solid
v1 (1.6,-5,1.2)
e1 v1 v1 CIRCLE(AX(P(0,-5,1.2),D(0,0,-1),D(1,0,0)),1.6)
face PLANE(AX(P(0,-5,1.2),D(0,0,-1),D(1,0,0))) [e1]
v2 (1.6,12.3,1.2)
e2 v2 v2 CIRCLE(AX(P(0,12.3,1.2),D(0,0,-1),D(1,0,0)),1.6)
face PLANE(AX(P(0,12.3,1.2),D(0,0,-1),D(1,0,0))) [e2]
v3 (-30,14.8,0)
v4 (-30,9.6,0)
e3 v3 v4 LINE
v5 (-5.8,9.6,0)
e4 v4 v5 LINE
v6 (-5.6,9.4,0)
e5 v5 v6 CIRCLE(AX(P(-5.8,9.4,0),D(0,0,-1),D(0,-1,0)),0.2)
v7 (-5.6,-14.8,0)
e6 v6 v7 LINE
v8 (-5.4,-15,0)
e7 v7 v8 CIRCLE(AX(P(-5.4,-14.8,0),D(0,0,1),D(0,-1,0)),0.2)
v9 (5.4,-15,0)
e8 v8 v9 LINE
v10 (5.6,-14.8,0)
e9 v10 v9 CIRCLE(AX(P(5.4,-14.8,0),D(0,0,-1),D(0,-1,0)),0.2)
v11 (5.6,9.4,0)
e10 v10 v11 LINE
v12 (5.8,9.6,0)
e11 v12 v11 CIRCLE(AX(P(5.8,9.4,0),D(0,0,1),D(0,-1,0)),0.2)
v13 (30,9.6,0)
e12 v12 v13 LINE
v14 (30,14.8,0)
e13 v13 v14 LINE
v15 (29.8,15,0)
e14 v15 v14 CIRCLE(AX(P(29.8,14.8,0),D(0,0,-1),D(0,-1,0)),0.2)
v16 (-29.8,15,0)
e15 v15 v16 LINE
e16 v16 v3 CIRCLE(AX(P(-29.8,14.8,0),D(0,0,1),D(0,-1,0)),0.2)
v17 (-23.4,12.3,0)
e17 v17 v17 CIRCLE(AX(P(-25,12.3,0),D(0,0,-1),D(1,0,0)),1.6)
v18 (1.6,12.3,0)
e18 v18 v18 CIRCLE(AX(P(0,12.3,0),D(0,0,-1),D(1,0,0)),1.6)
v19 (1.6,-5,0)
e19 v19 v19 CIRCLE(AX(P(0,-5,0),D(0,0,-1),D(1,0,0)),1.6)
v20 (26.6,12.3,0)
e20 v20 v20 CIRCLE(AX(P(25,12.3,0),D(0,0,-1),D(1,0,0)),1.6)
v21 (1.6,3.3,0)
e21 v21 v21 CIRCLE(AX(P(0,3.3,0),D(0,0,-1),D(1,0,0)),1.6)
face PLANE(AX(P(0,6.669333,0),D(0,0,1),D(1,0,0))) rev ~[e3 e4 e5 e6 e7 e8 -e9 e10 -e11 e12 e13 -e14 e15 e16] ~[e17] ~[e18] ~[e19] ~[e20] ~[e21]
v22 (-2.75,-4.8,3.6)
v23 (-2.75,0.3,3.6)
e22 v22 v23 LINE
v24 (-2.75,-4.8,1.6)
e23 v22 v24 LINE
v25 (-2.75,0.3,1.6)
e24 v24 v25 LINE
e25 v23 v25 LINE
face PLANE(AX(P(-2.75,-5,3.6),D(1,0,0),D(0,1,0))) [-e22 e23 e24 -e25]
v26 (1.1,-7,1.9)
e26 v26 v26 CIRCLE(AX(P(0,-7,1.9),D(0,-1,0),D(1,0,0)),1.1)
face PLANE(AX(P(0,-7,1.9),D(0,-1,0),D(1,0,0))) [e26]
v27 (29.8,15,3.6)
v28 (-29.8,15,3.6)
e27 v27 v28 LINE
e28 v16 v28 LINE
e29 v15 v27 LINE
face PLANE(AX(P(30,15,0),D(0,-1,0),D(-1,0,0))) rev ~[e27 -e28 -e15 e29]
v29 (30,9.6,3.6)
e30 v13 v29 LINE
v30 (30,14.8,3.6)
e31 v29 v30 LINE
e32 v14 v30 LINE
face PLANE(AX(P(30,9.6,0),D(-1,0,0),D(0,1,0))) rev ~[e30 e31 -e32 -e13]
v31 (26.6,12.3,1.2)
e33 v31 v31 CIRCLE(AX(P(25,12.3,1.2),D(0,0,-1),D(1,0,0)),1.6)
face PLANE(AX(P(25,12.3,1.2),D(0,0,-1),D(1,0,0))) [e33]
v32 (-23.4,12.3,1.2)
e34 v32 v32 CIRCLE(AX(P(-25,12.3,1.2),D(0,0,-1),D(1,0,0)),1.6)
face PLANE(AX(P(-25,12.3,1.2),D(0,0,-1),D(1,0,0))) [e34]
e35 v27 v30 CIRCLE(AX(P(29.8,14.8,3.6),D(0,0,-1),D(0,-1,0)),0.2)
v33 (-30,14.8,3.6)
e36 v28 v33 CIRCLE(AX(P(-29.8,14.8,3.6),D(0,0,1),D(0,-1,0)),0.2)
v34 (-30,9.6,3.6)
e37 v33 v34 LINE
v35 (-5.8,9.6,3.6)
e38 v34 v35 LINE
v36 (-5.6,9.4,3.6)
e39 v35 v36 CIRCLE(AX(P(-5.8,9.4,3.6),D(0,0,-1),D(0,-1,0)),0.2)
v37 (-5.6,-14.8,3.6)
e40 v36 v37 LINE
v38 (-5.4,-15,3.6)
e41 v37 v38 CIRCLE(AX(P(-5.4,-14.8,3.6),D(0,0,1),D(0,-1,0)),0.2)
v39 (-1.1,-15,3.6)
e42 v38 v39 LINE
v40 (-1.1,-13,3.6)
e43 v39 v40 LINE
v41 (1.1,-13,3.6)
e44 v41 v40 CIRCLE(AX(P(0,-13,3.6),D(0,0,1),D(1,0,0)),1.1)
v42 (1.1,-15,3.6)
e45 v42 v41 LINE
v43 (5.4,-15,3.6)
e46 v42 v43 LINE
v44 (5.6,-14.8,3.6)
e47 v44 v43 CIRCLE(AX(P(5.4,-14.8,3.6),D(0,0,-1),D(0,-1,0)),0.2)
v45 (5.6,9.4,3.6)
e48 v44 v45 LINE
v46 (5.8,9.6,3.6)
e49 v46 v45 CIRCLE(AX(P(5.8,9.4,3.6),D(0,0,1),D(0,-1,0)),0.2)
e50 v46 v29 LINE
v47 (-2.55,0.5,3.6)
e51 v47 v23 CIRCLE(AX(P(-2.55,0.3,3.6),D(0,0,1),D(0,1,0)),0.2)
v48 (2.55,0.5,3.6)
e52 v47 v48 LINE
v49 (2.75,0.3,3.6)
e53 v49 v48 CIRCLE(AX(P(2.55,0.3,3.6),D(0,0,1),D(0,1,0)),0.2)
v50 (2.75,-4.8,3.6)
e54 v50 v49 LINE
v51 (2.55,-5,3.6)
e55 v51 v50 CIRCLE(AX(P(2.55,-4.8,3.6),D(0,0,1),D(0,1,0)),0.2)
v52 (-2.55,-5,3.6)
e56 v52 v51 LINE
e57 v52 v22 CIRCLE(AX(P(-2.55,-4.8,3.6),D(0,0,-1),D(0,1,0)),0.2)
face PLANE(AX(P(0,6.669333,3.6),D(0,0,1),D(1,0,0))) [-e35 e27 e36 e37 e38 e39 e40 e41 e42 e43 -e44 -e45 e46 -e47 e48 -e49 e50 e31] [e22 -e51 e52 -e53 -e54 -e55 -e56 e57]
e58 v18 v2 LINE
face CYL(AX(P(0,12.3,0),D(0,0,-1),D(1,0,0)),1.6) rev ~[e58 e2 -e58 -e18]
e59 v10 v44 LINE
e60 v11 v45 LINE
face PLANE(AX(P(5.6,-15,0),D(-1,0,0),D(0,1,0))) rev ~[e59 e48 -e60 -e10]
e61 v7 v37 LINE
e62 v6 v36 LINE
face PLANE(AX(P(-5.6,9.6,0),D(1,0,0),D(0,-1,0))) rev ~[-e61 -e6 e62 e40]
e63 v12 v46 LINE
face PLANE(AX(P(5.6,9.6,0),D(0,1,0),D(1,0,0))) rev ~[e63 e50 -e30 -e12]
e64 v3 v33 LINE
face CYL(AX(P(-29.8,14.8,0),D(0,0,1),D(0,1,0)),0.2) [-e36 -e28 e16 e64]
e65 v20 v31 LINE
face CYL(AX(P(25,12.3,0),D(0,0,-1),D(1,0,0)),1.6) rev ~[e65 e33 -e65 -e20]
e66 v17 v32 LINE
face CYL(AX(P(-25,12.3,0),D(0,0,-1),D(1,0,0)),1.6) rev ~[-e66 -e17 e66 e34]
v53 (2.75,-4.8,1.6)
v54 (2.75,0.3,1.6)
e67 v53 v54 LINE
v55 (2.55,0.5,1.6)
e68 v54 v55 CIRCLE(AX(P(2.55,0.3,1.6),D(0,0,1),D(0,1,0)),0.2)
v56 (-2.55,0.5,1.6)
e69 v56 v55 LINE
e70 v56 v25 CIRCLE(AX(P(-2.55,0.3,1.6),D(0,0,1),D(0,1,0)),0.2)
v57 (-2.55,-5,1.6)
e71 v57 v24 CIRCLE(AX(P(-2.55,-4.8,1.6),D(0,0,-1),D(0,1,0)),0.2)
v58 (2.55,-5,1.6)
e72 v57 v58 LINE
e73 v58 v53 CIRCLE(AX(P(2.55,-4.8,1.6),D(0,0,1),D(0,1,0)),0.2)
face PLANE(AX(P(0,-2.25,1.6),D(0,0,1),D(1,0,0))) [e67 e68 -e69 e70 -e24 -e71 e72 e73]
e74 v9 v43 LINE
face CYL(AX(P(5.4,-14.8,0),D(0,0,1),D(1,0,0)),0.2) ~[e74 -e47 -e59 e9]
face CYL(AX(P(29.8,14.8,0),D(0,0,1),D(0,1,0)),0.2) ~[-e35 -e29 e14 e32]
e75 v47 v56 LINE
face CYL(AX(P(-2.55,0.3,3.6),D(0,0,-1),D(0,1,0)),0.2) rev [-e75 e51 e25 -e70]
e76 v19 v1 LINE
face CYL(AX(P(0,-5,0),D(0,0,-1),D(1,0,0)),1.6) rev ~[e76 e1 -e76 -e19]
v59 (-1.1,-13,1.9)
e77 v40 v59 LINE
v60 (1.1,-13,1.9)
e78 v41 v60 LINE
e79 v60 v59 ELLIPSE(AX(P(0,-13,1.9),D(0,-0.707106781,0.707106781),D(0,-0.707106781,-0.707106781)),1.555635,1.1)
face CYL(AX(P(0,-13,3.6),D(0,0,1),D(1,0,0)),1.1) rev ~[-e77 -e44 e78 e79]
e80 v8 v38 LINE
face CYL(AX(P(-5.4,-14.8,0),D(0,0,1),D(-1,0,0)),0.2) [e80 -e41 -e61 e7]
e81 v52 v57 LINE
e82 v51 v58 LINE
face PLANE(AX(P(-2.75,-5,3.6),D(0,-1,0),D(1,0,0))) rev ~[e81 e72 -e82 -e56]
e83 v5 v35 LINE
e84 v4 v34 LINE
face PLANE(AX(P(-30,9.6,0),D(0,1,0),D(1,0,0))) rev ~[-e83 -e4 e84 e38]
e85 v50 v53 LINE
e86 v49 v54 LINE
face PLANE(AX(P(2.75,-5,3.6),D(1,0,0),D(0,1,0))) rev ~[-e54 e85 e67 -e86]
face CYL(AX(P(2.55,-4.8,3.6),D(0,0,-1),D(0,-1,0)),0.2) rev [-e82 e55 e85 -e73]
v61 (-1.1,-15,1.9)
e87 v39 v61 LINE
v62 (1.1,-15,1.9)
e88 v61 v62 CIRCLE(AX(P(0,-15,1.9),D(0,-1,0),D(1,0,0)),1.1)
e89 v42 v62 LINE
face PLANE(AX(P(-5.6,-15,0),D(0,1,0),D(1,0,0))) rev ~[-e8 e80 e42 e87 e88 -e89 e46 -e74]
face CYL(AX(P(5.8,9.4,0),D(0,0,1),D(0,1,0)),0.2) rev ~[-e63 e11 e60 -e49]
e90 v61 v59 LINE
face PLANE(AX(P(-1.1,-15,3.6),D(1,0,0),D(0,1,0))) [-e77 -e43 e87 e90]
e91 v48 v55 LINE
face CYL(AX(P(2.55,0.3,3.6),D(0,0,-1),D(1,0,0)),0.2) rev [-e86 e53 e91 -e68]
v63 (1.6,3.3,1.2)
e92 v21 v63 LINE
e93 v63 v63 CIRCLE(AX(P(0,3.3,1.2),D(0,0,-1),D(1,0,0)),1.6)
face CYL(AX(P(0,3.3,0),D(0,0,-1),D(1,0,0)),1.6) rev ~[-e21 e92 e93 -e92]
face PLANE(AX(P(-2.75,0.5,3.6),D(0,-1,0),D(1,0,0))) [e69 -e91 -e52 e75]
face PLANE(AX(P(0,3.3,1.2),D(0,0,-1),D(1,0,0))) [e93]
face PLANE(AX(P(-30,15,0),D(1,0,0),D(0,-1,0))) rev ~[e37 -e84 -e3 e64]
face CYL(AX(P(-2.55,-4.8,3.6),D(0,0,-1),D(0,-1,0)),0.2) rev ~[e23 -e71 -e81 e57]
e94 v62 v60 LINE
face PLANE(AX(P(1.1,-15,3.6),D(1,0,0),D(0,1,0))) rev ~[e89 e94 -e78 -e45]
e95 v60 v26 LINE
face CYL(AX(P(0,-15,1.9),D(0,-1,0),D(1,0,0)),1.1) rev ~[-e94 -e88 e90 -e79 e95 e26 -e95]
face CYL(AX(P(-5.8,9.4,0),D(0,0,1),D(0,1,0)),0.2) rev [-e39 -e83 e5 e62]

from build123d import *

# Parameters (mm, degrees)
F1_DEPTH = 3.6
F2_R     = 1.1
F3_DEPTH = 8
F4_W     = 2.2
F4_H     = 2
F5_DEPTH = 1.7
F6_R     = 1.6
F7_DEPTH = 1.2
F8_W     = 5.5
F8_H     = 5.5
F9_DEPTH = 2
F10_R    = 0.2


# Not quite as in the source:
# - a feature names something its author has since deleted; it is built from what else it names


with BuildPart() as f1:
    # F0 (on Top) → F1 (new body)
    with BuildSketch(Plane.XY):
        Polygon((30, 15), (-30, 15), (-30, 9.6), (-5.6, 9.6), (-5.6, -15), (5.6, -15), (5.6, 9.6), (30, 9.6), align=None)
    extrude(amount=F1_DEPTH)

    # F2 (on face) → F3 (cut)
    with BuildSketch(Plane.XZ.offset(15)):
        with Locations((0, 1.9)):
            Circle(F2_R)
    extrude(amount=-F3_DEPTH, mode=Mode.SUBTRACT)

    # F4 (on face) → F5 (cut)
    with BuildSketch(Plane.XY.offset(3.6)):
        with Locations((0, -14)):
            Rectangle(F4_W, F4_H)
        with BuildLine():
            ThreePointArc((1.1, -13), (0, -11.9), (-1.1, -13))
            Line((-1.1, -13), (1.1, -13))
        make_face()
    extrude(amount=-F5_DEPTH, mode=Mode.SUBTRACT)

    # F6 (on face) → F7 (cut)
    with BuildSketch(Plane(origin=(0, 0, 0), x_dir=(1, 0, 0), z_dir=(0, 0, -1))):
        with Locations((0, 5)):
            Circle(F6_R)
        with Locations((0, -3.3)):
            Circle(F6_R)
        with Locations((25, -12.3)):
            Circle(F6_R)
        with Locations((-25, -12.3)):
            Circle(F6_R)
        with Locations((0, -12.3)):
            Circle(F6_R)
    extrude(amount=-F7_DEPTH, mode=Mode.SUBTRACT)

    # F8 (on face) → F9 (cut)
    with BuildSketch(Plane.XY.offset(3.6)):
        with Locations((0, -2.25)):
            Rectangle(F8_W, F8_H)
    extrude(amount=-F9_DEPTH, mode=Mode.SUBTRACT)

    # F10
    f10_edges = [f1.edges().sort_by_distance(p)[0] for p in [
        (-5.6, 9.6, 1.8),
        (5.6, 9.6, 1.8),
        (30, 15, 1.8),
        (-30, 15, 1.8),
        (-2.75, 0.5, 2.6),
        (2.75, 0.5, 2.6),
        (2.75, -5, 2.6),
        (-2.75, -5, 2.6),
        (5.6, -15, 1.8),
        (-5.6, -15, 1.8),
    ]]
    fillet(f10_edges, radius=F10_R)


solid = f1.part
